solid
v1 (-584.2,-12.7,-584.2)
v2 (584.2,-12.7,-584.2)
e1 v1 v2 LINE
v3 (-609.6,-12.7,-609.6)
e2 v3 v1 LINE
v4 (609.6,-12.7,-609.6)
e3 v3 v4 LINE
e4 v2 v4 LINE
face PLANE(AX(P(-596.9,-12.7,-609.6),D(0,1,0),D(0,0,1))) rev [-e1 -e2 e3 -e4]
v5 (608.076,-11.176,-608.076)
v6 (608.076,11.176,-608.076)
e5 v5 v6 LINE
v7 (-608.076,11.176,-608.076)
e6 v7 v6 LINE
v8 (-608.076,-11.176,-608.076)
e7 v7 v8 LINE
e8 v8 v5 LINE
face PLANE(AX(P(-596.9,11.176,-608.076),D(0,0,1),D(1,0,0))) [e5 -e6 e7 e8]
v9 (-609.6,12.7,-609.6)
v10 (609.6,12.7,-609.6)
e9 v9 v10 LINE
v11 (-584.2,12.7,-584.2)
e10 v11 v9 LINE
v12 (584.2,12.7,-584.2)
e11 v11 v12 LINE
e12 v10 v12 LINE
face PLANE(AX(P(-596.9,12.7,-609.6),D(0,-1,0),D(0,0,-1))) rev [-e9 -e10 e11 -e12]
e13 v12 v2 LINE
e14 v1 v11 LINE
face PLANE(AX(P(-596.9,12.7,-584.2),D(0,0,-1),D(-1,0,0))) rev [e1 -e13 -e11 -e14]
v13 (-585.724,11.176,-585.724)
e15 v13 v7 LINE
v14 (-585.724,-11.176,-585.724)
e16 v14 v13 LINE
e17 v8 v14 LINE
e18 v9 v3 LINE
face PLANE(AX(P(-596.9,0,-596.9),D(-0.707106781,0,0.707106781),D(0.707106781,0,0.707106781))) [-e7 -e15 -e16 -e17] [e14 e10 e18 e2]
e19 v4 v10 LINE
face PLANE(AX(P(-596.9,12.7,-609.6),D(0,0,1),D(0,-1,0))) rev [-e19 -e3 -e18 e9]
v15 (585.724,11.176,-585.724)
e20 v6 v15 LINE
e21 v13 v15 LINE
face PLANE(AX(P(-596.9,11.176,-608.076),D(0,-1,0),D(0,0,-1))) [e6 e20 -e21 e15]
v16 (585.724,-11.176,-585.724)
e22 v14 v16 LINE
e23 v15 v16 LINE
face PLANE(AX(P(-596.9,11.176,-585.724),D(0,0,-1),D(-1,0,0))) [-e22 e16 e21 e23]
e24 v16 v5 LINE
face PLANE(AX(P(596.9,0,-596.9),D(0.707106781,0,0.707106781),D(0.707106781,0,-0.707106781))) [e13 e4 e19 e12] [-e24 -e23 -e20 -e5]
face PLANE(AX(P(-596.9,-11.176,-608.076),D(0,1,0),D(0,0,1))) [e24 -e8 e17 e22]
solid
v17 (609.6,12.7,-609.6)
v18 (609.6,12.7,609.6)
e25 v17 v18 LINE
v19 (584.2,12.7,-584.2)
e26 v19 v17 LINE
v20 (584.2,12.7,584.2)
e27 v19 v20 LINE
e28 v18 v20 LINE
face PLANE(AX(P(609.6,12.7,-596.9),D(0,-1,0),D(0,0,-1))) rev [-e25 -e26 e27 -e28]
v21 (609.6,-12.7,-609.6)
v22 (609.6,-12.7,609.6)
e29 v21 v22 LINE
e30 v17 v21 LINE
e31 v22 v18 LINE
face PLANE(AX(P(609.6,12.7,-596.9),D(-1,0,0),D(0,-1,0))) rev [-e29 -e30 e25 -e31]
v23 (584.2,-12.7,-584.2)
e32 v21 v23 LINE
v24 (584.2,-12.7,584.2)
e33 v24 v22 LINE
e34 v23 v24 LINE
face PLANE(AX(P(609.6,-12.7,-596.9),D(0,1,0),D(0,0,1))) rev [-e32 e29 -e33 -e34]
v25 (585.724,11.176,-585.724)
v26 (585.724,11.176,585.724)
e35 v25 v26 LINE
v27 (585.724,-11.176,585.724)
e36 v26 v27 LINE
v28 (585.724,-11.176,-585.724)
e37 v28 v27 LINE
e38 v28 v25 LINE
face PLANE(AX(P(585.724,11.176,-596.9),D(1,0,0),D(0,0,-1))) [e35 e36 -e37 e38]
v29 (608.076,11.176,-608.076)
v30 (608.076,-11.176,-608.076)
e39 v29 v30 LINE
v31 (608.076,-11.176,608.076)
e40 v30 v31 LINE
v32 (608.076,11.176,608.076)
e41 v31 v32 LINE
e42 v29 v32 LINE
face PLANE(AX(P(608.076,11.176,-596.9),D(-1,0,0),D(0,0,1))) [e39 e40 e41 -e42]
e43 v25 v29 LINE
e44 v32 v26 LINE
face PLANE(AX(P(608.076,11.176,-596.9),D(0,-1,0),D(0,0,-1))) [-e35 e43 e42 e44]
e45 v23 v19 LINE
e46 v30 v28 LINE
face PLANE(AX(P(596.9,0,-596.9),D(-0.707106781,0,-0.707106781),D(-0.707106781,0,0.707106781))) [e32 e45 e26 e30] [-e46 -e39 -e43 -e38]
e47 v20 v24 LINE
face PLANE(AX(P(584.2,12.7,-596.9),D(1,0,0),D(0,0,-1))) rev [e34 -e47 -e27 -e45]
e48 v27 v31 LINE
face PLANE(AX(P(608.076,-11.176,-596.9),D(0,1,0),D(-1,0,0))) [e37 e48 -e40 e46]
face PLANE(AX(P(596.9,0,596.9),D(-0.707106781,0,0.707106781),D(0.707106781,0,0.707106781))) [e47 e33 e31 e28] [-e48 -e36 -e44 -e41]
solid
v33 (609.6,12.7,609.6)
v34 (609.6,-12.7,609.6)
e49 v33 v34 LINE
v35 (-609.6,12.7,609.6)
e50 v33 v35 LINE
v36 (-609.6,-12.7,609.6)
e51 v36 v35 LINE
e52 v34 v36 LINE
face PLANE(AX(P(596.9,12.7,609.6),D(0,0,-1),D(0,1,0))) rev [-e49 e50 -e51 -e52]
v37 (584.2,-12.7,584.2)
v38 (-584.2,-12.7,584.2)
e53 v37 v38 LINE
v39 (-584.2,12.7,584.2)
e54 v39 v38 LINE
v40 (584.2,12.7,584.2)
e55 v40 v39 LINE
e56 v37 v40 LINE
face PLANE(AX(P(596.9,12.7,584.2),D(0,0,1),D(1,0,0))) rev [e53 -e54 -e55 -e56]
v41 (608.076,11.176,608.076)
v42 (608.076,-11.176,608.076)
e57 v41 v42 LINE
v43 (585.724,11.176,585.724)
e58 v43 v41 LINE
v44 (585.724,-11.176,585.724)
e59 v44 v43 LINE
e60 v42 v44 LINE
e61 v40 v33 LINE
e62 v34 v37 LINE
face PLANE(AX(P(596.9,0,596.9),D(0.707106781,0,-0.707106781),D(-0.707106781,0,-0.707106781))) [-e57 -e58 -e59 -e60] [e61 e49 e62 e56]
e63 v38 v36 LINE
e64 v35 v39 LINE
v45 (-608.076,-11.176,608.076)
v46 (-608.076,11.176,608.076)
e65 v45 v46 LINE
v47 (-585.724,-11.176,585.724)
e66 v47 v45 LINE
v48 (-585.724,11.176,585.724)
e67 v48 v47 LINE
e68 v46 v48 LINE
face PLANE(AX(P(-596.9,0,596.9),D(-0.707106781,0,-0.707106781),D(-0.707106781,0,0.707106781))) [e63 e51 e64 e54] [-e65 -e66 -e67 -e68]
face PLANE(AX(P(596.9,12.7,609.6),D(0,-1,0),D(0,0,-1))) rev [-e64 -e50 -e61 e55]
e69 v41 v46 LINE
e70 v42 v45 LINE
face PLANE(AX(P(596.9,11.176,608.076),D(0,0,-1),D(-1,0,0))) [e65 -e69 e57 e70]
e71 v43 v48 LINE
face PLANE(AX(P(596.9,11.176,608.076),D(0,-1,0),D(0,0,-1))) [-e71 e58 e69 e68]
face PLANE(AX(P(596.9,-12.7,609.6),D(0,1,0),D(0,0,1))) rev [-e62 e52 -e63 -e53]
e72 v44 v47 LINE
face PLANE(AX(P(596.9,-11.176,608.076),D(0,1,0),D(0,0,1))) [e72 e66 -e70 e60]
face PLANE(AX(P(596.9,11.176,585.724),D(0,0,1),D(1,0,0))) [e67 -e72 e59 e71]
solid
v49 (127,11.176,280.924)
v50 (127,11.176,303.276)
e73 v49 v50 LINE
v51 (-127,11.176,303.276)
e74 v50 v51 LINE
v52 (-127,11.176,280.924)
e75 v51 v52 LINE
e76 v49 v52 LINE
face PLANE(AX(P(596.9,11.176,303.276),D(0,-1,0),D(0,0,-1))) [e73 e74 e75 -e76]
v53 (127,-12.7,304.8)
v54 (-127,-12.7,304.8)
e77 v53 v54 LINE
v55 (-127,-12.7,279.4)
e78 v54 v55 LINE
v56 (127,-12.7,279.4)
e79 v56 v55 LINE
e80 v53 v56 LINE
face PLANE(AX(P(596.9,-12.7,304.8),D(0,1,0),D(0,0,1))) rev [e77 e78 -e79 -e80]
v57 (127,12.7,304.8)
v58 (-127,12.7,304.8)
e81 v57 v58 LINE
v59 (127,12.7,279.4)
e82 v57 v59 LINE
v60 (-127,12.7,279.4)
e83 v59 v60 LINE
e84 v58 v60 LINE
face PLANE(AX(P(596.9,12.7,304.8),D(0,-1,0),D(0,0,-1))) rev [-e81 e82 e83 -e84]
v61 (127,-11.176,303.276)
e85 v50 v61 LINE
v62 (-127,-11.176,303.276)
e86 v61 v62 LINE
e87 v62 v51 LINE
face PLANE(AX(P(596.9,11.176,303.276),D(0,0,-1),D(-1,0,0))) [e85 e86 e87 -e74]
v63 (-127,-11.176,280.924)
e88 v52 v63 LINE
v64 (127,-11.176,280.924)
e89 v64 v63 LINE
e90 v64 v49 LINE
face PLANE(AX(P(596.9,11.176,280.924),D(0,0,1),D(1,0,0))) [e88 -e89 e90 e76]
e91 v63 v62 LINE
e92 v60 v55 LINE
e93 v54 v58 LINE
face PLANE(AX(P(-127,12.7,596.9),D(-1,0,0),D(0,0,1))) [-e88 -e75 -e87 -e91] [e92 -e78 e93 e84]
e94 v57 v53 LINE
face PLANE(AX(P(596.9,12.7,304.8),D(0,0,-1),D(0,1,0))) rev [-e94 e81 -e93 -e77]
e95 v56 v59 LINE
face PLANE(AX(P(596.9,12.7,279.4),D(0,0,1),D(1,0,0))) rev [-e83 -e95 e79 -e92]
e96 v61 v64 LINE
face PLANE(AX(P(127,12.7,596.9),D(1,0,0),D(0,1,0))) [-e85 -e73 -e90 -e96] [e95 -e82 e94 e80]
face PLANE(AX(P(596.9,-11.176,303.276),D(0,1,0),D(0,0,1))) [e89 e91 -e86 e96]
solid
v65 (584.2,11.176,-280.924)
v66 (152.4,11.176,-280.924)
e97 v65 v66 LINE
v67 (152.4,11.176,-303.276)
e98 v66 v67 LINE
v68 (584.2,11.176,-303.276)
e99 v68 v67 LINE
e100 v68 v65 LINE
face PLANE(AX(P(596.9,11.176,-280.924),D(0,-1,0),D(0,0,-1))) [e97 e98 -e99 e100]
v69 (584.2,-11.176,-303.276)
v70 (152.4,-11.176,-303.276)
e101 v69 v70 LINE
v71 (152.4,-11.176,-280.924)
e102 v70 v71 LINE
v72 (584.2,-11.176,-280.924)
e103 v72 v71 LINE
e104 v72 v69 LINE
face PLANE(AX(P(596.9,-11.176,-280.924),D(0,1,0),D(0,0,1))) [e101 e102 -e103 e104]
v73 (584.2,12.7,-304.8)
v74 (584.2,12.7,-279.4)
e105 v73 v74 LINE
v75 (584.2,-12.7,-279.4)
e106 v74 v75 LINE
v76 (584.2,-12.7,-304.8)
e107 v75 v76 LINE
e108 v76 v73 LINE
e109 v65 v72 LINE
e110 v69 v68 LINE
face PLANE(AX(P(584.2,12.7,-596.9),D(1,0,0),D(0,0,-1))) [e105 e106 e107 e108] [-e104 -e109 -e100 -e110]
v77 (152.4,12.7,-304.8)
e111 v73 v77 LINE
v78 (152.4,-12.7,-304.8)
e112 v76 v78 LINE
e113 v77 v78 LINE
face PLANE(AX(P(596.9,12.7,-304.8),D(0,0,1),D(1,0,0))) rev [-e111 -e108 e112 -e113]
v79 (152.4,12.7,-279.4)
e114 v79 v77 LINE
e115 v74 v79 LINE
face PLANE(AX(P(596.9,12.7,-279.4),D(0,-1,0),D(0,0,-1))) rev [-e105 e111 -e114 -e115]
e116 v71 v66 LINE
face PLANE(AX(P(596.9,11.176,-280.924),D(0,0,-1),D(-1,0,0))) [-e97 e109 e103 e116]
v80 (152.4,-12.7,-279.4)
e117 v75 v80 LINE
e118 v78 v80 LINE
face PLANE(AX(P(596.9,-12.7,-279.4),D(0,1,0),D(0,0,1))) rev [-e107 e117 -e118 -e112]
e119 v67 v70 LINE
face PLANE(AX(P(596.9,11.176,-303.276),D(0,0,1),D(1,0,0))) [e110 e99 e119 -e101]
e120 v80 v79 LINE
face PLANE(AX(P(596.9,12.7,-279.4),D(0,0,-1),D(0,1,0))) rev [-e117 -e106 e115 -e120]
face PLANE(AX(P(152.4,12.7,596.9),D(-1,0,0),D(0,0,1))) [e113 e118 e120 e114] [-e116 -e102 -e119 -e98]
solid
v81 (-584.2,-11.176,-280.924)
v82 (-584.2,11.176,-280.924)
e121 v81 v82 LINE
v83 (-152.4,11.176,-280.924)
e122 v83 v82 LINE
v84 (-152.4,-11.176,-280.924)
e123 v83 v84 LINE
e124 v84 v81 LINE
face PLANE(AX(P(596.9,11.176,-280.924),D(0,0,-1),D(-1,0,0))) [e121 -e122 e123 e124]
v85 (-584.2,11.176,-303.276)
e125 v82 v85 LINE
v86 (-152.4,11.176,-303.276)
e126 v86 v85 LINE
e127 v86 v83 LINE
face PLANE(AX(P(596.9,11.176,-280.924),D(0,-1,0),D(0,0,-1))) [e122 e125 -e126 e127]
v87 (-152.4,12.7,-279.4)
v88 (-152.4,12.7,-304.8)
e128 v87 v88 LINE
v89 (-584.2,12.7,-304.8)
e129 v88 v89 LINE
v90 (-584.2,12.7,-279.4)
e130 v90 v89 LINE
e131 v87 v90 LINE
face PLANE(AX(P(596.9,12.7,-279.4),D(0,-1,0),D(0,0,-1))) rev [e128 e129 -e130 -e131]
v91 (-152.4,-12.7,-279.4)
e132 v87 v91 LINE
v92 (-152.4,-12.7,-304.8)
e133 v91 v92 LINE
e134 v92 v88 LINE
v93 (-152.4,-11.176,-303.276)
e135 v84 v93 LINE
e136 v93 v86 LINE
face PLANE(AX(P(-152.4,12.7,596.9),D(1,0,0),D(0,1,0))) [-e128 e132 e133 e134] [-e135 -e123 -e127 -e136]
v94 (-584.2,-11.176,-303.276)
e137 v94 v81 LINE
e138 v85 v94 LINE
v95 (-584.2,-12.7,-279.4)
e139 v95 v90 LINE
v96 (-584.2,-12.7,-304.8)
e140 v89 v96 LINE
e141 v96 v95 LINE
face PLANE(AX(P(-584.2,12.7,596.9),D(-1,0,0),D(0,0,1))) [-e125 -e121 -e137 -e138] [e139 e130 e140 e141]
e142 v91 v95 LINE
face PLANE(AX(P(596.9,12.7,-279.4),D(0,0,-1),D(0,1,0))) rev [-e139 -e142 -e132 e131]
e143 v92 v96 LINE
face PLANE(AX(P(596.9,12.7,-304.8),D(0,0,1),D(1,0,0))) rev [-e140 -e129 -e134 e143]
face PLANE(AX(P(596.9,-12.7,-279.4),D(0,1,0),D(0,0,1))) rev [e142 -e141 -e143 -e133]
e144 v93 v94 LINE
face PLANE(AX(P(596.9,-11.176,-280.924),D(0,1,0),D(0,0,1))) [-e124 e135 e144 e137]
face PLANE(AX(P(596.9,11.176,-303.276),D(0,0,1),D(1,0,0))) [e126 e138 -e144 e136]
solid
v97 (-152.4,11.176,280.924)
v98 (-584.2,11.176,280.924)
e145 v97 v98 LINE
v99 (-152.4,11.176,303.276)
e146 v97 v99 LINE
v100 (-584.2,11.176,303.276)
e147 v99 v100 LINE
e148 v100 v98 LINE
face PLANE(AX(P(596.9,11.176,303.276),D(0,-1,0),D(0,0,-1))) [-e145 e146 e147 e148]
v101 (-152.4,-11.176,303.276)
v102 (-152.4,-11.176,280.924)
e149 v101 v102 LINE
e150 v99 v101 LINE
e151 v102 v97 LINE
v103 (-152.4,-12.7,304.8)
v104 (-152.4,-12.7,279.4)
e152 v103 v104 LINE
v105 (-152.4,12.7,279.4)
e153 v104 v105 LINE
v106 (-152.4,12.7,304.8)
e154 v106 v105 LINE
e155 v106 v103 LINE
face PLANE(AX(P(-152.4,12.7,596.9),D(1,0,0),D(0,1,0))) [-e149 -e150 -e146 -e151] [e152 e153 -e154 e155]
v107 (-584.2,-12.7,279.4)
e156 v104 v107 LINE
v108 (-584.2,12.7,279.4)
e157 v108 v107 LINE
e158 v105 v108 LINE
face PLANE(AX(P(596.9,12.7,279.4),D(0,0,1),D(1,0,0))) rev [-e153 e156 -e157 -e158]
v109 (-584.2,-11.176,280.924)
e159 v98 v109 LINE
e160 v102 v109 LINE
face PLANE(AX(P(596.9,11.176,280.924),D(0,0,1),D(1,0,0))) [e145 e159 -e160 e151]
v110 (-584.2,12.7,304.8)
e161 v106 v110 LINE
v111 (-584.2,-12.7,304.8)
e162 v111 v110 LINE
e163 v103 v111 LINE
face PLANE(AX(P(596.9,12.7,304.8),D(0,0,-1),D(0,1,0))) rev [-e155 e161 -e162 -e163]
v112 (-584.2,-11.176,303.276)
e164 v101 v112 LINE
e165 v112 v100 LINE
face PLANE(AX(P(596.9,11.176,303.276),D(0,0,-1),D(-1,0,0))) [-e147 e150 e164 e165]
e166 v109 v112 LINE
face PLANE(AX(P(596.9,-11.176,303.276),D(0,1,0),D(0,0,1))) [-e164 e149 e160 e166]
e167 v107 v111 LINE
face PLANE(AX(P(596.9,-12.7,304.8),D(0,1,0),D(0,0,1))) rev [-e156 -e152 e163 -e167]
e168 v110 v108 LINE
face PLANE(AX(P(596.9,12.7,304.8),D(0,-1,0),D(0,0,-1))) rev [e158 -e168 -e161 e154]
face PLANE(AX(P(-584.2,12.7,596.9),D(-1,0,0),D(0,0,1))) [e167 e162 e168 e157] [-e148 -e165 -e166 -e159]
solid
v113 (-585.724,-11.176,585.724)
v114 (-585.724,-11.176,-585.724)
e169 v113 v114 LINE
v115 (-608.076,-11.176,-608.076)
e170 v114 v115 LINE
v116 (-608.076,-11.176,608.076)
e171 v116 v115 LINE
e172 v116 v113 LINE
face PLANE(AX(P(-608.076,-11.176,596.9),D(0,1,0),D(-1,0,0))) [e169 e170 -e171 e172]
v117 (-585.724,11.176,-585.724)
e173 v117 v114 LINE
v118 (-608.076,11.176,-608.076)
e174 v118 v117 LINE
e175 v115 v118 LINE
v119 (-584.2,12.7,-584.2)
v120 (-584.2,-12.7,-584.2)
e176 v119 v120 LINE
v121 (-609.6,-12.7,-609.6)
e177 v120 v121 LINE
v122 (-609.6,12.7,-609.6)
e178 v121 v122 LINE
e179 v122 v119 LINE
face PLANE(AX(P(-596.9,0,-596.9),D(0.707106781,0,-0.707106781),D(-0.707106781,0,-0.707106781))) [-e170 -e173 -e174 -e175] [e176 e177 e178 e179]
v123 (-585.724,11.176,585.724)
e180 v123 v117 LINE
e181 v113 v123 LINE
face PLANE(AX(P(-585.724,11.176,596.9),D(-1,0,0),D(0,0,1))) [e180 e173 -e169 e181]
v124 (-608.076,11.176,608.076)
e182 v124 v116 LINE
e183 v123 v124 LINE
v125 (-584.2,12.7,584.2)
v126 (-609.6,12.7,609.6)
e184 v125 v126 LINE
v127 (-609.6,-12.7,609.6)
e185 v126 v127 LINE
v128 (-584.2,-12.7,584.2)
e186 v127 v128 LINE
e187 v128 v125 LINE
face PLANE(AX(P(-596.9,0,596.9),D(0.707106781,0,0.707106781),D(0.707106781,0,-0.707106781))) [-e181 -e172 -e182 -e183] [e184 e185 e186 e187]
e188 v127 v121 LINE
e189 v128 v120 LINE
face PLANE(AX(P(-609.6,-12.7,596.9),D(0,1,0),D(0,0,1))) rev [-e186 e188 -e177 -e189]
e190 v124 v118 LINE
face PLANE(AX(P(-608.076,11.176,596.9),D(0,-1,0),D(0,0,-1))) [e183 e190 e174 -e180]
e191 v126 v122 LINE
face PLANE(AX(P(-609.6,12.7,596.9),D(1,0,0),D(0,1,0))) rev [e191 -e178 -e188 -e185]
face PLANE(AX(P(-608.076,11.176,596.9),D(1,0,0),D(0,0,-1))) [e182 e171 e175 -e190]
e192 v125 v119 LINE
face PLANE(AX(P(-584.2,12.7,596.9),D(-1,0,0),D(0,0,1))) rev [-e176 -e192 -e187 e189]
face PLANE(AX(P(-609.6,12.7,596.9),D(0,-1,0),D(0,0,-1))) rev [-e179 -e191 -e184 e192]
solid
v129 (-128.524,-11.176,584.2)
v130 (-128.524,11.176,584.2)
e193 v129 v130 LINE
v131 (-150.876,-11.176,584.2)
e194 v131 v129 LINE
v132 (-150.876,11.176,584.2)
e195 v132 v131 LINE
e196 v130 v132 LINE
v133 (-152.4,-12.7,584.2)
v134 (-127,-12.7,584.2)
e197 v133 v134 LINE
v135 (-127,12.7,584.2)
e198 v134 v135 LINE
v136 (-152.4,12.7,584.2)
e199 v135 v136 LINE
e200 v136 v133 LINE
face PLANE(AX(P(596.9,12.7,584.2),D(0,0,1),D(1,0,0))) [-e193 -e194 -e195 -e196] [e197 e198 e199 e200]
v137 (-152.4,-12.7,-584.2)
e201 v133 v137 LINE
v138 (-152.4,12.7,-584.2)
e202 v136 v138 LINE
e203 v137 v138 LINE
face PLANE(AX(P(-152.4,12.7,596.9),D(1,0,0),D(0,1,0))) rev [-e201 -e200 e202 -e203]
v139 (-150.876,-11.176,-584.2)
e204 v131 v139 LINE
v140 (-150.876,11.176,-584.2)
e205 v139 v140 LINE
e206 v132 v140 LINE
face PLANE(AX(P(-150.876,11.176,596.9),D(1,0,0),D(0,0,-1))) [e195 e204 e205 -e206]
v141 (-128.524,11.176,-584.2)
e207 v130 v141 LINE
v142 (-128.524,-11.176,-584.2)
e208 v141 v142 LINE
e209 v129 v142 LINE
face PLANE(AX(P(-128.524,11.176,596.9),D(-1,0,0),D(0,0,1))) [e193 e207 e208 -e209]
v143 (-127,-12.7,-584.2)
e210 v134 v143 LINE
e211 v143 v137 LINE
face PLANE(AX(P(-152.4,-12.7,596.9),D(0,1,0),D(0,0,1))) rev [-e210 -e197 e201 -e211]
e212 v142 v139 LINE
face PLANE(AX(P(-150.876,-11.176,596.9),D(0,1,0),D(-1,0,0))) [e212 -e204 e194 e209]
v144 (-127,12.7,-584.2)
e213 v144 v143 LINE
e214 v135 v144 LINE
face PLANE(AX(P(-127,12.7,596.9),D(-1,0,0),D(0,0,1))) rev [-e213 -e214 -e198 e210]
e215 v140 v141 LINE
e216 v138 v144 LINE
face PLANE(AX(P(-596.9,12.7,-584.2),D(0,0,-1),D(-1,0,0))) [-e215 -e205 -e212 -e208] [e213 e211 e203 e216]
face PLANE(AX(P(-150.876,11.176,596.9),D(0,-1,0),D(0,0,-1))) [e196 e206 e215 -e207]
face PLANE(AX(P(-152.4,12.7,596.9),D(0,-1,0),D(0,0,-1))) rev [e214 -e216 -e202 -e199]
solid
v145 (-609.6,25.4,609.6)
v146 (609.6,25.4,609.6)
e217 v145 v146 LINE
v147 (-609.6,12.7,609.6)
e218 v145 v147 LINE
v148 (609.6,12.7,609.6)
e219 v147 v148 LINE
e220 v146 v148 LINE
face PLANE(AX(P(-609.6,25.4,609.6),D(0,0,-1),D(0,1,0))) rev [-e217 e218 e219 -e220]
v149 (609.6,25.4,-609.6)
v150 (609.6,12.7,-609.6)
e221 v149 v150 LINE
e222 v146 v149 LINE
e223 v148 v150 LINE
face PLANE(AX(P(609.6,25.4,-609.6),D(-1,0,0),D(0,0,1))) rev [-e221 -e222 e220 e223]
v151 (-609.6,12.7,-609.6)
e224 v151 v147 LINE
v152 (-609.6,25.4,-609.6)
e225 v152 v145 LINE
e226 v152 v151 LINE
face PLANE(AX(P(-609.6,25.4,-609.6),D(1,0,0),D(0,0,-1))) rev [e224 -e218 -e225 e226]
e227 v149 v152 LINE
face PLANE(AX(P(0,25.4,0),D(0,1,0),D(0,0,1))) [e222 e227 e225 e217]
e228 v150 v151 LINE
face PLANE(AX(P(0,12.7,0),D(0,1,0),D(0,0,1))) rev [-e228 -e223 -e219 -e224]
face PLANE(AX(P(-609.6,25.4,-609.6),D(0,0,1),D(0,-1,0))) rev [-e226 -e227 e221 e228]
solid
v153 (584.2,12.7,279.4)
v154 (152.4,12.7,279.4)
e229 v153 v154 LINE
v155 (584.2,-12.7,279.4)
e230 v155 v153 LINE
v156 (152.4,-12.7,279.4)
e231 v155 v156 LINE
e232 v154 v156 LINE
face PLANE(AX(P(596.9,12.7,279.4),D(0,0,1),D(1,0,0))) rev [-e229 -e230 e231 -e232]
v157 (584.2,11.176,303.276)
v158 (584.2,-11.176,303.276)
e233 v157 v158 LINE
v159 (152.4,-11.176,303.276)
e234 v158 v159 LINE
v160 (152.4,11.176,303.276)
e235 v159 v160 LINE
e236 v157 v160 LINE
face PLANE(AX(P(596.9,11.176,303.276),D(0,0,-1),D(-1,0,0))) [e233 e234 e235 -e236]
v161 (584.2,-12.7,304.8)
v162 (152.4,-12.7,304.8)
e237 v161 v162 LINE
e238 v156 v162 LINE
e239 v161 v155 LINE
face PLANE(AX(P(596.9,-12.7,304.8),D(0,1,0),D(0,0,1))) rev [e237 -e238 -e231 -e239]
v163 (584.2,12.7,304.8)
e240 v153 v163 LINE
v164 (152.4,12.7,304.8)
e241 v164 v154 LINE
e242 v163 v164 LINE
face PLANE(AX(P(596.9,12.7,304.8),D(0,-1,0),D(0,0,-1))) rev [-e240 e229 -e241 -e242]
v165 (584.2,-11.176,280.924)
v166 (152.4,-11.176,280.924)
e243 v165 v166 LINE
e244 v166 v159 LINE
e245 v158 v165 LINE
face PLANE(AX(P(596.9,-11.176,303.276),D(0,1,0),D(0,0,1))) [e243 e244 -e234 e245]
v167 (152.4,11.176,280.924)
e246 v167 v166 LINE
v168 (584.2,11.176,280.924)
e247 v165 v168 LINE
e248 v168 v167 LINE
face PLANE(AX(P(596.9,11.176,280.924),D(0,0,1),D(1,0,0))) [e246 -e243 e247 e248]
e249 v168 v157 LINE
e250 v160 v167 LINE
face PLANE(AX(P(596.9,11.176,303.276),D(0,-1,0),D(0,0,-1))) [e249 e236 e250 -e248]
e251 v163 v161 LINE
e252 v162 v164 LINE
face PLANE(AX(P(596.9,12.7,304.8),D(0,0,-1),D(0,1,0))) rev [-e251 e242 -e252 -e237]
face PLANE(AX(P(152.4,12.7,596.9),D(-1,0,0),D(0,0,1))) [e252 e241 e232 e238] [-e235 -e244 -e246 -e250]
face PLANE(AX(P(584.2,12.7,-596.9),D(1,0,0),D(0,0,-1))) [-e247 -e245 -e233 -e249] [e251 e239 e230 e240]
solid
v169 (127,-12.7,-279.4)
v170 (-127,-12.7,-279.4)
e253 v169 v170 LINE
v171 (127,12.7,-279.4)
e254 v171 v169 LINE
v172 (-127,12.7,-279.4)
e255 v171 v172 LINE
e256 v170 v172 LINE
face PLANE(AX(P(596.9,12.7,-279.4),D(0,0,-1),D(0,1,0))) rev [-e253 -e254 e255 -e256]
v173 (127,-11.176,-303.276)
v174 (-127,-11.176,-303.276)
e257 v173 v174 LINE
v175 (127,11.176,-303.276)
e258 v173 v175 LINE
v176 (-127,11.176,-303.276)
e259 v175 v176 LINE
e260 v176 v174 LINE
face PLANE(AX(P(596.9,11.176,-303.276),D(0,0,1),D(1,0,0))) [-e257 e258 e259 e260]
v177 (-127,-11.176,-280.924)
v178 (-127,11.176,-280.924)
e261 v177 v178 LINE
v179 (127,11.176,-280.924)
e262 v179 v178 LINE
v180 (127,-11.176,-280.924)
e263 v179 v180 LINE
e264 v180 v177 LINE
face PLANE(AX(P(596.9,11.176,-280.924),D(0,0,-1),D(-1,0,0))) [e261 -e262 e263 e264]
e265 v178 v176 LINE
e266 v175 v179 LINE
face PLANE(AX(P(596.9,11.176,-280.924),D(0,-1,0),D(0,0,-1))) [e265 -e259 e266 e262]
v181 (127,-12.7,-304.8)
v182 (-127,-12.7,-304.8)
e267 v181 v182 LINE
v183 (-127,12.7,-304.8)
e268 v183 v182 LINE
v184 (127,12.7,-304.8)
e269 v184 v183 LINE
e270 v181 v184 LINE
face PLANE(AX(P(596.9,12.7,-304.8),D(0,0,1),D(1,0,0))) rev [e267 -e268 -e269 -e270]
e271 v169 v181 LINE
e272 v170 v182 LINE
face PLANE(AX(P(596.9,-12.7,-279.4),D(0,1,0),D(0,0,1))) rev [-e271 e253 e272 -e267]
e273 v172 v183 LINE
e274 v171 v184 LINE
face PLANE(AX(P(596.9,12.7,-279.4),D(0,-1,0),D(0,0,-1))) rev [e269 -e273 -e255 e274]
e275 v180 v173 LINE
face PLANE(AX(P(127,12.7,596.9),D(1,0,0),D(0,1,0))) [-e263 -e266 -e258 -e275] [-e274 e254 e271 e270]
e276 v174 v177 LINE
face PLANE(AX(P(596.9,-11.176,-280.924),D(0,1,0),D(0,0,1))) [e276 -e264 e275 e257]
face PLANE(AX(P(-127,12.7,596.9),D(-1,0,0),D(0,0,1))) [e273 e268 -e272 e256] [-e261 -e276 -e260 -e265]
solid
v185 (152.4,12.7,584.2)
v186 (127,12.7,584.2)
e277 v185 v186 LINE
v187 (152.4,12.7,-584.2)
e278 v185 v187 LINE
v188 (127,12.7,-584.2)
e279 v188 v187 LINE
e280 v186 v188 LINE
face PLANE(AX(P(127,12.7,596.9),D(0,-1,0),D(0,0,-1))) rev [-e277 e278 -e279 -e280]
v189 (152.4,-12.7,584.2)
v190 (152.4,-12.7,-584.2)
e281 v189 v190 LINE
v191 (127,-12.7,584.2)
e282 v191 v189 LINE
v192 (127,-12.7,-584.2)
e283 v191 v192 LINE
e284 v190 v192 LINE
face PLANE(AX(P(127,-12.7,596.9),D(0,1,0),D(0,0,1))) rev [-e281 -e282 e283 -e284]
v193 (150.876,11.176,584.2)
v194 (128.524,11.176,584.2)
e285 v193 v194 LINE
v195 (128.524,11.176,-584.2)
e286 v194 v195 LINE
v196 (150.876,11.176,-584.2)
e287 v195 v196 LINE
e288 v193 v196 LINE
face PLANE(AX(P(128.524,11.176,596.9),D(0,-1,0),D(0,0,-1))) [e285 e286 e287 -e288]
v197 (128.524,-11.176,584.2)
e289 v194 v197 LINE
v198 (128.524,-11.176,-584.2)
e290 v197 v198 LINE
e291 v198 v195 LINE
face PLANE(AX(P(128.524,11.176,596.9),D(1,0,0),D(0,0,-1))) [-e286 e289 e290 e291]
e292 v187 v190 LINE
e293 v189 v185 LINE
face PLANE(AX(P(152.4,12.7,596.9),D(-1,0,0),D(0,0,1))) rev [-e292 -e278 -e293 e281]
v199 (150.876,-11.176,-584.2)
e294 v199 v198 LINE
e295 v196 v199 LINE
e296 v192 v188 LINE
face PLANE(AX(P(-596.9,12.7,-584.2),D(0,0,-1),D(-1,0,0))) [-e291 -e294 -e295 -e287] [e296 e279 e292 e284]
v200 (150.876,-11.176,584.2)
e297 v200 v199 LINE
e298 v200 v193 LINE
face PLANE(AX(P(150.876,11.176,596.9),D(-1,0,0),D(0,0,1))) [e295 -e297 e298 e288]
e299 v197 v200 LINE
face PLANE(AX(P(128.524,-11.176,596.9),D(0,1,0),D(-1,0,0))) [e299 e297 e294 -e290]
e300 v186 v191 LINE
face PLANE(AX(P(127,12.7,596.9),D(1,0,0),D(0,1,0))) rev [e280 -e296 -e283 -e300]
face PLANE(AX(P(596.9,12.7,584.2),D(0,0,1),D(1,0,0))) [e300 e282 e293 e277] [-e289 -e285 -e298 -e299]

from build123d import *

# Parameters (mm, degrees)
RECTANGULAR_START                         = -152.4
RECTANGULAR_TUBE_1X1X0_060_1_OUTLINE_W    = 1.524
RECTANGULAR_TUBE_1X1X0_060_1_OUTLINE_H    = 1168.4
RECTANGULAR_TUBE_1X1X0_060_1_DEPTH        = 25.4
RECTANGULAR_TUBE_1X1X0_060_1_2_OUTLINE_W  = 22.352
RECTANGULAR_TUBE_1X1X0_060_1_2_OUTLINE_H  = 1168.4
RECTANGULAR_TUBE_1X1X0_060_1_2_DEPTH      = 1.524
RECTANGULAR_START_2                       = -128.524
RECTANGULAR_TUBE_1X1X0_060_1_3_OUTLINE_W  = 22.352
RECTANGULAR_TUBE_1X1X0_060_1_3_OUTLINE_H  = 1168.4
RECTANGULAR_TUBE_1X1X0_060_1_3_DEPTH      = 1.524
RECTANGULAR_START_3                       = 127
RECTANGULAR_TUBE_1X1X0_060_1_4_OUTLINE_W  = 1.524
RECTANGULAR_TUBE_1X1X0_060_1_4_OUTLINE_H  = 1168.4
RECTANGULAR_TUBE_1X1X0_060_1_4_DEPTH      = 25.4
RECTANGULAR_TUBE_1X1X0_060_1_5_OUTLINE_W  = 22.352
RECTANGULAR_TUBE_1X1X0_060_1_5_OUTLINE_H  = 1168.4
RECTANGULAR_TUBE_1X1X0_060_1_5_DEPTH      = 1.524
RECTANGULAR_START_4                       = 150.876
RECTANGULAR_TUBE_1X1X0_060_1_6_OUTLINE_W  = 22.352
RECTANGULAR_TUBE_1X1X0_060_1_6_OUTLINE_H  = 1168.4
RECTANGULAR_TUBE_1X1X0_060_1_6_DEPTH      = 1.524
RECTANGULAR_START_5                       = -12.7
RECTANGULAR_TUBE_1X1X0_060_1_7_DEPTH      = 25.4
RECTANGULAR_TUBE_1X1X0_060_1_8_DEPTH      = 1.524
RECTANGULAR_START_6                       = 11.176
RECTANGULAR_TUBE_1X1X0_060_1_9_DEPTH      = 1.524
RECTANGULAR_TUBE_1X1X0_060_1_10_DEPTH     = 25.4
RECTANGULAR_TUBE_1X1X0_060_1_11_DEPTH     = 1.524
RECTANGULAR_TUBE_1X1X0_060_1_12_DEPTH     = 1.524
RECTANGULAR_TUBE_1X1X0_060_1_13_DEPTH     = 25.4
RECTANGULAR_TUBE_1X1X0_060_1_14_DEPTH     = 1.524
RECTANGULAR_TUBE_1X1X0_060_1_15_DEPTH     = 1.524
RECTANGULAR_TUBE_1X1X0_060_1_16_DEPTH     = 25.4
RECTANGULAR_TUBE_1X1X0_060_1_17_DEPTH     = 1.524
RECTANGULAR_TUBE_1X1X0_060_1_18_DEPTH     = 1.524
RECTANGULAR_START_7                       = -304.8
RECTANGULAR_TUBE_1X1X0_060_1_19_OUTLINE_W = 431.8
RECTANGULAR_TUBE_1X1X0_060_1_19_OUTLINE_H = 1.524
RECTANGULAR_TUBE_1X1X0_060_1_19_DEPTH     = 25.4
RECTANGULAR_TUBE_1X1X0_060_1_20_OUTLINE_W = 431.8
RECTANGULAR_TUBE_1X1X0_060_1_20_OUTLINE_H = 22.352
RECTANGULAR_TUBE_1X1X0_060_1_20_DEPTH     = 1.524
RECTANGULAR_START_8                       = -280.924
RECTANGULAR_TUBE_1X1X0_060_1_21_OUTLINE_W = 431.8
RECTANGULAR_TUBE_1X1X0_060_1_21_OUTLINE_H = 22.352
RECTANGULAR_TUBE_1X1X0_060_1_21_DEPTH     = 1.524
RECTANGULAR_TUBE_1X1X0_060_1_22_OUTLINE_W = 431.8
RECTANGULAR_TUBE_1X1X0_060_1_22_OUTLINE_H = 1.524
RECTANGULAR_TUBE_1X1X0_060_1_22_DEPTH     = 25.4
RECTANGULAR_TUBE_1X1X0_060_1_23_OUTLINE_W = 431.8
RECTANGULAR_TUBE_1X1X0_060_1_23_OUTLINE_H = 22.352
RECTANGULAR_TUBE_1X1X0_060_1_23_DEPTH     = 1.524
RECTANGULAR_TUBE_1X1X0_060_1_24_OUTLINE_W = 431.8
RECTANGULAR_TUBE_1X1X0_060_1_24_OUTLINE_H = 22.352
RECTANGULAR_TUBE_1X1X0_060_1_24_DEPTH     = 1.524
RECTANGULAR_TUBE_1X1X0_060_1_25_OUTLINE_W = 254
RECTANGULAR_TUBE_1X1X0_060_1_25_OUTLINE_H = 1.524
RECTANGULAR_TUBE_1X1X0_060_1_25_DEPTH     = 25.4
RECTANGULAR_TUBE_1X1X0_060_1_26_OUTLINE_W = 254
RECTANGULAR_TUBE_1X1X0_060_1_26_OUTLINE_H = 22.352
RECTANGULAR_TUBE_1X1X0_060_1_26_DEPTH     = 1.524
RECTANGULAR_TUBE_1X1X0_060_1_27_OUTLINE_W = 254
RECTANGULAR_TUBE_1X1X0_060_1_27_OUTLINE_H = 22.352
RECTANGULAR_TUBE_1X1X0_060_1_27_DEPTH     = 1.524
RECTANGULAR_START_9                       = 279.4
RECTANGULAR_TUBE_1X1X0_060_1_28_OUTLINE_W = 431.8
RECTANGULAR_TUBE_1X1X0_060_1_28_OUTLINE_H = 1.524
RECTANGULAR_TUBE_1X1X0_060_1_28_DEPTH     = 25.4
RECTANGULAR_TUBE_1X1X0_060_1_29_OUTLINE_W = 431.8
RECTANGULAR_TUBE_1X1X0_060_1_29_OUTLINE_H = 22.352
RECTANGULAR_TUBE_1X1X0_060_1_29_DEPTH     = 1.524
RECTANGULAR_START_10                      = 303.276
RECTANGULAR_TUBE_1X1X0_060_1_30_OUTLINE_W = 431.8
RECTANGULAR_TUBE_1X1X0_060_1_30_OUTLINE_H = 22.352
RECTANGULAR_TUBE_1X1X0_060_1_30_DEPTH     = 1.524
RECTANGULAR_TUBE_1X1X0_060_1_31_OUTLINE_W = 431.8
RECTANGULAR_TUBE_1X1X0_060_1_31_OUTLINE_H = 1.524
RECTANGULAR_TUBE_1X1X0_060_1_31_DEPTH     = 25.4
RECTANGULAR_TUBE_1X1X0_060_1_32_OUTLINE_W = 431.8
RECTANGULAR_TUBE_1X1X0_060_1_32_OUTLINE_H = 22.352
RECTANGULAR_TUBE_1X1X0_060_1_32_DEPTH     = 1.524
RECTANGULAR_TUBE_1X1X0_060_1_33_OUTLINE_W = 431.8
RECTANGULAR_TUBE_1X1X0_060_1_33_OUTLINE_H = 22.352
RECTANGULAR_TUBE_1X1X0_060_1_33_DEPTH     = 1.524
RECTANGULAR_TUBE_1X1X0_060_1_34_OUTLINE_W = 254
RECTANGULAR_TUBE_1X1X0_060_1_34_OUTLINE_H = 1.524
RECTANGULAR_TUBE_1X1X0_060_1_34_DEPTH     = 25.4
RECTANGULAR_TUBE_1X1X0_060_1_35_OUTLINE_W = 254
RECTANGULAR_TUBE_1X1X0_060_1_35_OUTLINE_H = 22.352
RECTANGULAR_TUBE_1X1X0_060_1_35_DEPTH     = 1.524
RECTANGULAR_TUBE_1X1X0_060_1_36_OUTLINE_W = 254
RECTANGULAR_TUBE_1X1X0_060_1_36_OUTLINE_H = 22.352
RECTANGULAR_TUBE_1X1X0_060_1_36_DEPTH     = 1.524
SKETCH3_W                                 = 1219.2
SKETCH3_H                                 = 1219.2
BOSS_EXTRUDE1_DEPTH                       = 12.7


# Read off the part's stored shape, not the designer's step: Rectangular tube 1X1X0_060(1)
with BuildPart() as part:
    # Rectangular tube 1X1X0_060(1) outline → Rectangular tube 1X1X0_060(1) (new body)
    with BuildSketch(Plane.YZ.offset(RECTANGULAR_START)):
        with Locations((11.938, 0)):
            Rectangle(RECTANGULAR_TUBE_1X1X0_060_1_OUTLINE_W, RECTANGULAR_TUBE_1X1X0_060_1_OUTLINE_H)
        with Locations((-11.938, 0)):
            Rectangle(RECTANGULAR_TUBE_1X1X0_060_1_OUTLINE_W, RECTANGULAR_TUBE_1X1X0_060_1_OUTLINE_H)
    extrude(amount=RECTANGULAR_TUBE_1X1X0_060_1_DEPTH)

    # Rectangular tube 1X1X0_060_1 2 outline → Rectangular tube 1X1X0_060_1 2 (add)
    with BuildSketch(Plane.YZ.offset(RECTANGULAR_START)):
        Rectangle(RECTANGULAR_TUBE_1X1X0_060_1_2_OUTLINE_W, RECTANGULAR_TUBE_1X1X0_060_1_2_OUTLINE_H)
    extrude(amount=RECTANGULAR_TUBE_1X1X0_060_1_2_DEPTH)

    # Rectangular tube 1X1X0_060_1 3 outline → Rectangular tube 1X1X0_060_1 3 (add)
    with BuildSketch(Plane.YZ.offset(RECTANGULAR_START_2)):
        Rectangle(RECTANGULAR_TUBE_1X1X0_060_1_3_OUTLINE_W, RECTANGULAR_TUBE_1X1X0_060_1_3_OUTLINE_H)
    extrude(amount=RECTANGULAR_TUBE_1X1X0_060_1_3_DEPTH)


with BuildPart() as body_2:
    # Rectangular tube 1X1X0_060_1 4 outline → Rectangular tube 1X1X0_060_1 4 (new body)
    with BuildSketch(Plane.YZ.offset(RECTANGULAR_START_3)):
        with Locations((11.938, 0)):
            Rectangle(RECTANGULAR_TUBE_1X1X0_060_1_4_OUTLINE_W, RECTANGULAR_TUBE_1X1X0_060_1_4_OUTLINE_H)
        with Locations((-11.938, 0)):
            Rectangle(RECTANGULAR_TUBE_1X1X0_060_1_4_OUTLINE_W, RECTANGULAR_TUBE_1X1X0_060_1_4_OUTLINE_H)
    extrude(amount=RECTANGULAR_TUBE_1X1X0_060_1_4_DEPTH)

    # Rectangular tube 1X1X0_060_1 5 outline → Rectangular tube 1X1X0_060_1 5 (add)
    with BuildSketch(Plane.YZ.offset(RECTANGULAR_START_3)):
        Rectangle(RECTANGULAR_TUBE_1X1X0_060_1_5_OUTLINE_W, RECTANGULAR_TUBE_1X1X0_060_1_5_OUTLINE_H)
    extrude(amount=RECTANGULAR_TUBE_1X1X0_060_1_5_DEPTH)

    # Rectangular tube 1X1X0_060_1 6 outline → Rectangular tube 1X1X0_060_1 6 (add)
    with BuildSketch(Plane.YZ.offset(RECTANGULAR_START_4)):
        Rectangle(RECTANGULAR_TUBE_1X1X0_060_1_6_OUTLINE_W, RECTANGULAR_TUBE_1X1X0_060_1_6_OUTLINE_H)
    extrude(amount=RECTANGULAR_TUBE_1X1X0_060_1_6_DEPTH)


with BuildPart() as body_3:
    # Rectangular tube 1X1X0_060_1 7 outline → Rectangular tube 1X1X0_060_1 7 (new body)
    with BuildSketch(Plane(origin=(0, 0, 0), x_dir=(1, 0, 0), z_dir=(0, 1, 0)).offset(RECTANGULAR_START_5)):
        Polygon((-584.2, -584.2), (-584.2, 584.2), (-585.724, 585.724), (-585.724, -585.724), align=None)
        Polygon((-608.076, -608.076), (-608.076, 608.076), (-609.6, 609.6), (-609.6, -609.6), align=None)
    extrude(amount=RECTANGULAR_TUBE_1X1X0_060_1_7_DEPTH)

    # Rectangular tube 1X1X0_060_1 8 outline → Rectangular tube 1X1X0_060_1 8 (add)
    with BuildSketch(Plane(origin=(0, 0, 0), x_dir=(1, 0, 0), z_dir=(0, 1, 0)).offset(RECTANGULAR_START_5)):
        Polygon((-585.724, -585.724), (-585.724, 585.724), (-608.076, 608.076), (-608.076, -608.076), align=None)
    extrude(amount=RECTANGULAR_TUBE_1X1X0_060_1_8_DEPTH)

    # Rectangular tube 1X1X0_060_1 9 outline → Rectangular tube 1X1X0_060_1 9 (add)
    with BuildSketch(Plane(origin=(0, 0, 0), x_dir=(1, 0, 0), z_dir=(0, 1, 0)).offset(RECTANGULAR_START_6)):
        Polygon((-585.724, -585.724), (-585.724, 585.724), (-608.076, 608.076), (-608.076, -608.076), align=None)
    extrude(amount=RECTANGULAR_TUBE_1X1X0_060_1_9_DEPTH)


with BuildPart() as body_4:
    # Rectangular tube 1X1X0_060_1 10 outline → Rectangular tube 1X1X0_060_1 10 (new body)
    with BuildSketch(Plane(origin=(0, 0, 0), x_dir=(1, 0, 0), z_dir=(0, 1, 0)).offset(RECTANGULAR_START_5)):
        Polygon((-584.2, 584.2), (584.2, 584.2), (585.724, 585.724), (-585.724, 585.724), align=None)
        Polygon((-608.076, 608.076), (608.076, 608.076), (609.6, 609.6), (-609.6, 609.6), align=None)
    extrude(amount=RECTANGULAR_TUBE_1X1X0_060_1_10_DEPTH)

    # Rectangular tube 1X1X0_060_1 11 outline → Rectangular tube 1X1X0_060_1 11 (add)
    with BuildSketch(Plane(origin=(0, 0, 0), x_dir=(1, 0, 0), z_dir=(0, 1, 0)).offset(RECTANGULAR_START_5)):
        Polygon((-585.724, 585.724), (585.724, 585.724), (608.076, 608.076), (-608.076, 608.076), align=None)
    extrude(amount=RECTANGULAR_TUBE_1X1X0_060_1_11_DEPTH)

    # Rectangular tube 1X1X0_060_1 12 outline → Rectangular tube 1X1X0_060_1 12 (add)
    with BuildSketch(Plane(origin=(0, 0, 0), x_dir=(1, 0, 0), z_dir=(0, 1, 0)).offset(RECTANGULAR_START_6)):
        Polygon((-585.724, 585.724), (585.724, 585.724), (608.076, 608.076), (-608.076, 608.076), align=None)
    extrude(amount=RECTANGULAR_TUBE_1X1X0_060_1_12_DEPTH)


with BuildPart() as body_5:
    # Rectangular tube 1X1X0_060_1 13 outline → Rectangular tube 1X1X0_060_1 13 (new body)
    with BuildSketch(Plane(origin=(0, 0, 0), x_dir=(1, 0, 0), z_dir=(0, 1, 0)).offset(RECTANGULAR_START_5)):
        Polygon((584.2, -584.2), (-584.2, -584.2), (-585.724, -585.724), (585.724, -585.724), align=None)
        Polygon((608.076, -608.076), (-608.076, -608.076), (-609.6, -609.6), (609.6, -609.6), align=None)
    extrude(amount=RECTANGULAR_TUBE_1X1X0_060_1_13_DEPTH)

    # Rectangular tube 1X1X0_060_1 14 outline → Rectangular tube 1X1X0_060_1 14 (add)
    with BuildSketch(Plane(origin=(0, 0, 0), x_dir=(1, 0, 0), z_dir=(0, 1, 0)).offset(RECTANGULAR_START_5)):
        Polygon((585.724, -585.724), (-585.724, -585.724), (-608.076, -608.076), (608.076, -608.076), align=None)
    extrude(amount=RECTANGULAR_TUBE_1X1X0_060_1_14_DEPTH)

    # Rectangular tube 1X1X0_060_1 15 outline → Rectangular tube 1X1X0_060_1 15 (add)
    with BuildSketch(Plane(origin=(0, 0, 0), x_dir=(1, 0, 0), z_dir=(0, 1, 0)).offset(RECTANGULAR_START_6)):
        Polygon((585.724, -585.724), (-585.724, -585.724), (-608.076, -608.076), (608.076, -608.076), align=None)
    extrude(amount=RECTANGULAR_TUBE_1X1X0_060_1_15_DEPTH)


with BuildPart() as body_6:
    # Rectangular tube 1X1X0_060_1 16 outline → Rectangular tube 1X1X0_060_1 16 (new body)
    with BuildSketch(Plane(origin=(0, 0, 0), x_dir=(1, 0, 0), z_dir=(0, 1, 0)).offset(RECTANGULAR_START_5)):
        Polygon((584.2, 584.2), (584.2, -584.2), (585.724, -585.724), (585.724, 585.724), align=None)
        Polygon((608.076, 608.076), (608.076, -608.076), (609.6, -609.6), (609.6, 609.6), align=None)
    extrude(amount=RECTANGULAR_TUBE_1X1X0_060_1_16_DEPTH)

    # Rectangular tube 1X1X0_060_1 17 outline → Rectangular tube 1X1X0_060_1 17 (add)
    with BuildSketch(Plane(origin=(0, 0, 0), x_dir=(1, 0, 0), z_dir=(0, 1, 0)).offset(RECTANGULAR_START_5)):
        Polygon((585.724, 585.724), (585.724, -585.724), (608.076, -608.076), (608.076, 608.076), align=None)
    extrude(amount=RECTANGULAR_TUBE_1X1X0_060_1_17_DEPTH)

    # Rectangular tube 1X1X0_060_1 18 outline → Rectangular tube 1X1X0_060_1 18 (add)
    with BuildSketch(Plane(origin=(0, 0, 0), x_dir=(1, 0, 0), z_dir=(0, 1, 0)).offset(RECTANGULAR_START_6)):
        Polygon((585.724, 585.724), (585.724, -585.724), (608.076, -608.076), (608.076, 608.076), align=None)
    extrude(amount=RECTANGULAR_TUBE_1X1X0_060_1_18_DEPTH)


with BuildPart() as body_7:
    # Rectangular tube 1X1X0_060_1 19 outline → Rectangular tube 1X1X0_060_1 19 (new body)
    with BuildSketch(Plane.XY.offset(RECTANGULAR_START_7)):
        with Locations((368.3, 11.938)):
            Rectangle(RECTANGULAR_TUBE_1X1X0_060_1_19_OUTLINE_W, RECTANGULAR_TUBE_1X1X0_060_1_19_OUTLINE_H)
        with Locations((368.3, -11.938)):
            Rectangle(RECTANGULAR_TUBE_1X1X0_060_1_19_OUTLINE_W, RECTANGULAR_TUBE_1X1X0_060_1_19_OUTLINE_H)
    extrude(amount=RECTANGULAR_TUBE_1X1X0_060_1_19_DEPTH)

    # Rectangular tube 1X1X0_060_1 20 outline → Rectangular tube 1X1X0_060_1 20 (add)
    with BuildSketch(Plane.XY.offset(RECTANGULAR_START_7)):
        with Locations((368.3, 0)):
            Rectangle(RECTANGULAR_TUBE_1X1X0_060_1_20_OUTLINE_W, RECTANGULAR_TUBE_1X1X0_060_1_20_OUTLINE_H)
    extrude(amount=RECTANGULAR_TUBE_1X1X0_060_1_20_DEPTH)

    # Rectangular tube 1X1X0_060_1 21 outline → Rectangular tube 1X1X0_060_1 21 (add)
    with BuildSketch(Plane.XY.offset(RECTANGULAR_START_8)):
        with Locations((368.3, 0)):
            Rectangle(RECTANGULAR_TUBE_1X1X0_060_1_21_OUTLINE_W, RECTANGULAR_TUBE_1X1X0_060_1_21_OUTLINE_H)
    extrude(amount=RECTANGULAR_TUBE_1X1X0_060_1_21_DEPTH)


with BuildPart() as body_8:
    # Rectangular tube 1X1X0_060_1 22 outline → Rectangular tube 1X1X0_060_1 22 (new body)
    with BuildSketch(Plane(origin=(0, 0, 0), x_dir=(1, 0, 0), z_dir=(0, 1, 0)).offset(RECTANGULAR_START_5)):
        with Locations((-368.3, 304.038)):
            Rectangle(RECTANGULAR_TUBE_1X1X0_060_1_22_OUTLINE_W, RECTANGULAR_TUBE_1X1X0_060_1_22_OUTLINE_H)
        with Locations((-368.3, 280.162)):
            Rectangle(RECTANGULAR_TUBE_1X1X0_060_1_22_OUTLINE_W, RECTANGULAR_TUBE_1X1X0_060_1_22_OUTLINE_H)
    extrude(amount=RECTANGULAR_TUBE_1X1X0_060_1_22_DEPTH)

    # Rectangular tube 1X1X0_060_1 23 outline → Rectangular tube 1X1X0_060_1 23 (add)
    with BuildSketch(Plane(origin=(0, 0, 0), x_dir=(1, 0, 0), z_dir=(0, 1, 0)).offset(RECTANGULAR_START_5)):
        with Locations((-368.3, 292.1)):
            Rectangle(RECTANGULAR_TUBE_1X1X0_060_1_23_OUTLINE_W, RECTANGULAR_TUBE_1X1X0_060_1_23_OUTLINE_H)
    extrude(amount=RECTANGULAR_TUBE_1X1X0_060_1_23_DEPTH)

    # Rectangular tube 1X1X0_060_1 24 outline → Rectangular tube 1X1X0_060_1 24 (add)
    with BuildSketch(Plane(origin=(0, 0, 0), x_dir=(1, 0, 0), z_dir=(0, 1, 0)).offset(RECTANGULAR_START_6)):
        with Locations((-368.3, 292.1)):
            Rectangle(RECTANGULAR_TUBE_1X1X0_060_1_24_OUTLINE_W, RECTANGULAR_TUBE_1X1X0_060_1_24_OUTLINE_H)
    extrude(amount=RECTANGULAR_TUBE_1X1X0_060_1_24_DEPTH)


with BuildPart() as body_9:
    # Rectangular tube 1X1X0_060_1 25 outline → Rectangular tube 1X1X0_060_1 25 (new body)
    with BuildSketch(Plane.XY.offset(RECTANGULAR_START_7)):
        with Locations((0, -11.938)):
            Rectangle(RECTANGULAR_TUBE_1X1X0_060_1_25_OUTLINE_W, RECTANGULAR_TUBE_1X1X0_060_1_25_OUTLINE_H)
        with Locations((0, 11.938)):
            Rectangle(RECTANGULAR_TUBE_1X1X0_060_1_25_OUTLINE_W, RECTANGULAR_TUBE_1X1X0_060_1_25_OUTLINE_H)
    extrude(amount=RECTANGULAR_TUBE_1X1X0_060_1_25_DEPTH)

    # Rectangular tube 1X1X0_060_1 26 outline → Rectangular tube 1X1X0_060_1 26 (add)
    with BuildSketch(Plane.XY.offset(RECTANGULAR_START_7)):
        Rectangle(RECTANGULAR_TUBE_1X1X0_060_1_26_OUTLINE_W, RECTANGULAR_TUBE_1X1X0_060_1_26_OUTLINE_H)
    extrude(amount=RECTANGULAR_TUBE_1X1X0_060_1_26_DEPTH)

    # Rectangular tube 1X1X0_060_1 27 outline → Rectangular tube 1X1X0_060_1 27 (add)
    with BuildSketch(Plane.XY.offset(RECTANGULAR_START_8)):
        Rectangle(RECTANGULAR_TUBE_1X1X0_060_1_27_OUTLINE_W, RECTANGULAR_TUBE_1X1X0_060_1_27_OUTLINE_H)
    extrude(amount=RECTANGULAR_TUBE_1X1X0_060_1_27_DEPTH)


with BuildPart() as body_10:
    # Rectangular tube 1X1X0_060_1 28 outline → Rectangular tube 1X1X0_060_1 28 (new body)
    with BuildSketch(Plane.XY.offset(RECTANGULAR_START_9)):
        with Locations((368.3, 11.938)):
            Rectangle(RECTANGULAR_TUBE_1X1X0_060_1_28_OUTLINE_W, RECTANGULAR_TUBE_1X1X0_060_1_28_OUTLINE_H)
        with Locations((368.3, -11.938)):
            Rectangle(RECTANGULAR_TUBE_1X1X0_060_1_28_OUTLINE_W, RECTANGULAR_TUBE_1X1X0_060_1_28_OUTLINE_H)
    extrude(amount=RECTANGULAR_TUBE_1X1X0_060_1_28_DEPTH)

    # Rectangular tube 1X1X0_060_1 29 outline → Rectangular tube 1X1X0_060_1 29 (add)
    with BuildSketch(Plane.XY.offset(RECTANGULAR_START_9)):
        with Locations((368.3, 0)):
            Rectangle(RECTANGULAR_TUBE_1X1X0_060_1_29_OUTLINE_W, RECTANGULAR_TUBE_1X1X0_060_1_29_OUTLINE_H)
    extrude(amount=RECTANGULAR_TUBE_1X1X0_060_1_29_DEPTH)

    # Rectangular tube 1X1X0_060_1 30 outline → Rectangular tube 1X1X0_060_1 30 (add)
    with BuildSketch(Plane.XY.offset(RECTANGULAR_START_10)):
        with Locations((368.3, 0)):
            Rectangle(RECTANGULAR_TUBE_1X1X0_060_1_30_OUTLINE_W, RECTANGULAR_TUBE_1X1X0_060_1_30_OUTLINE_H)
    extrude(amount=RECTANGULAR_TUBE_1X1X0_060_1_30_DEPTH)


with BuildPart() as body_11:
    # Rectangular tube 1X1X0_060_1 31 outline → Rectangular tube 1X1X0_060_1 31 (new body)
    with BuildSketch(Plane(origin=(0, 0, 0), x_dir=(1, 0, 0), z_dir=(0, 1, 0)).offset(RECTANGULAR_START_5)):
        with Locations((-368.3, -280.162)):
            Rectangle(RECTANGULAR_TUBE_1X1X0_060_1_31_OUTLINE_W, RECTANGULAR_TUBE_1X1X0_060_1_31_OUTLINE_H)
        with Locations((-368.3, -304.038)):
            Rectangle(RECTANGULAR_TUBE_1X1X0_060_1_31_OUTLINE_W, RECTANGULAR_TUBE_1X1X0_060_1_31_OUTLINE_H)
    extrude(amount=RECTANGULAR_TUBE_1X1X0_060_1_31_DEPTH)

    # Rectangular tube 1X1X0_060_1 32 outline → Rectangular tube 1X1X0_060_1 32 (add)
    with BuildSketch(Plane(origin=(0, 0, 0), x_dir=(1, 0, 0), z_dir=(0, 1, 0)).offset(RECTANGULAR_START_5)):
        with Locations((-368.3, -292.1)):
            Rectangle(RECTANGULAR_TUBE_1X1X0_060_1_32_OUTLINE_W, RECTANGULAR_TUBE_1X1X0_060_1_32_OUTLINE_H)
    extrude(amount=RECTANGULAR_TUBE_1X1X0_060_1_32_DEPTH)

    # Rectangular tube 1X1X0_060_1 33 outline → Rectangular tube 1X1X0_060_1 33 (add)
    with BuildSketch(Plane(origin=(0, 0, 0), x_dir=(1, 0, 0), z_dir=(0, 1, 0)).offset(RECTANGULAR_START_6)):
        with Locations((-368.3, -292.1)):
            Rectangle(RECTANGULAR_TUBE_1X1X0_060_1_33_OUTLINE_W, RECTANGULAR_TUBE_1X1X0_060_1_33_OUTLINE_H)
    extrude(amount=RECTANGULAR_TUBE_1X1X0_060_1_33_DEPTH)


with BuildPart() as body_12:
    # Rectangular tube 1X1X0_060_1 34 outline → Rectangular tube 1X1X0_060_1 34 (new body)
    with BuildSketch(Plane.XY.offset(RECTANGULAR_START_9)):
        with Locations((0, -11.938)):
            Rectangle(RECTANGULAR_TUBE_1X1X0_060_1_34_OUTLINE_W, RECTANGULAR_TUBE_1X1X0_060_1_34_OUTLINE_H)
        with Locations((0, 11.938)):
            Rectangle(RECTANGULAR_TUBE_1X1X0_060_1_34_OUTLINE_W, RECTANGULAR_TUBE_1X1X0_060_1_34_OUTLINE_H)
    extrude(amount=RECTANGULAR_TUBE_1X1X0_060_1_34_DEPTH)

    # Rectangular tube 1X1X0_060_1 35 outline → Rectangular tube 1X1X0_060_1 35 (add)
    with BuildSketch(Plane.XY.offset(RECTANGULAR_START_9)):
        Rectangle(RECTANGULAR_TUBE_1X1X0_060_1_35_OUTLINE_W, RECTANGULAR_TUBE_1X1X0_060_1_35_OUTLINE_H)
    extrude(amount=RECTANGULAR_TUBE_1X1X0_060_1_35_DEPTH)

    # Rectangular tube 1X1X0_060_1 36 outline → Rectangular tube 1X1X0_060_1 36 (add)
    with BuildSketch(Plane.XY.offset(RECTANGULAR_START_10)):
        Rectangle(RECTANGULAR_TUBE_1X1X0_060_1_36_OUTLINE_W, RECTANGULAR_TUBE_1X1X0_060_1_36_OUTLINE_H)
    extrude(amount=RECTANGULAR_TUBE_1X1X0_060_1_36_DEPTH)


with BuildPart() as body_13:
    # Sketch3 → Boss-Extrude1 (new body)
    with BuildSketch(Plane(origin=(0, 12.7, 0), x_dir=(1, 0, 0), z_dir=(0, 1, 0))):
        Rectangle(SKETCH3_W, SKETCH3_H)
    extrude(amount=BOSS_EXTRUDE1_DEPTH)


solid = Compound([part.part, body_2.part, body_3.part, body_4.part, body_5.part, body_6.part, body_7.part, body_8.part, body_9.part, body_10.part, body_11.part, body_12.part, body_13.part])
